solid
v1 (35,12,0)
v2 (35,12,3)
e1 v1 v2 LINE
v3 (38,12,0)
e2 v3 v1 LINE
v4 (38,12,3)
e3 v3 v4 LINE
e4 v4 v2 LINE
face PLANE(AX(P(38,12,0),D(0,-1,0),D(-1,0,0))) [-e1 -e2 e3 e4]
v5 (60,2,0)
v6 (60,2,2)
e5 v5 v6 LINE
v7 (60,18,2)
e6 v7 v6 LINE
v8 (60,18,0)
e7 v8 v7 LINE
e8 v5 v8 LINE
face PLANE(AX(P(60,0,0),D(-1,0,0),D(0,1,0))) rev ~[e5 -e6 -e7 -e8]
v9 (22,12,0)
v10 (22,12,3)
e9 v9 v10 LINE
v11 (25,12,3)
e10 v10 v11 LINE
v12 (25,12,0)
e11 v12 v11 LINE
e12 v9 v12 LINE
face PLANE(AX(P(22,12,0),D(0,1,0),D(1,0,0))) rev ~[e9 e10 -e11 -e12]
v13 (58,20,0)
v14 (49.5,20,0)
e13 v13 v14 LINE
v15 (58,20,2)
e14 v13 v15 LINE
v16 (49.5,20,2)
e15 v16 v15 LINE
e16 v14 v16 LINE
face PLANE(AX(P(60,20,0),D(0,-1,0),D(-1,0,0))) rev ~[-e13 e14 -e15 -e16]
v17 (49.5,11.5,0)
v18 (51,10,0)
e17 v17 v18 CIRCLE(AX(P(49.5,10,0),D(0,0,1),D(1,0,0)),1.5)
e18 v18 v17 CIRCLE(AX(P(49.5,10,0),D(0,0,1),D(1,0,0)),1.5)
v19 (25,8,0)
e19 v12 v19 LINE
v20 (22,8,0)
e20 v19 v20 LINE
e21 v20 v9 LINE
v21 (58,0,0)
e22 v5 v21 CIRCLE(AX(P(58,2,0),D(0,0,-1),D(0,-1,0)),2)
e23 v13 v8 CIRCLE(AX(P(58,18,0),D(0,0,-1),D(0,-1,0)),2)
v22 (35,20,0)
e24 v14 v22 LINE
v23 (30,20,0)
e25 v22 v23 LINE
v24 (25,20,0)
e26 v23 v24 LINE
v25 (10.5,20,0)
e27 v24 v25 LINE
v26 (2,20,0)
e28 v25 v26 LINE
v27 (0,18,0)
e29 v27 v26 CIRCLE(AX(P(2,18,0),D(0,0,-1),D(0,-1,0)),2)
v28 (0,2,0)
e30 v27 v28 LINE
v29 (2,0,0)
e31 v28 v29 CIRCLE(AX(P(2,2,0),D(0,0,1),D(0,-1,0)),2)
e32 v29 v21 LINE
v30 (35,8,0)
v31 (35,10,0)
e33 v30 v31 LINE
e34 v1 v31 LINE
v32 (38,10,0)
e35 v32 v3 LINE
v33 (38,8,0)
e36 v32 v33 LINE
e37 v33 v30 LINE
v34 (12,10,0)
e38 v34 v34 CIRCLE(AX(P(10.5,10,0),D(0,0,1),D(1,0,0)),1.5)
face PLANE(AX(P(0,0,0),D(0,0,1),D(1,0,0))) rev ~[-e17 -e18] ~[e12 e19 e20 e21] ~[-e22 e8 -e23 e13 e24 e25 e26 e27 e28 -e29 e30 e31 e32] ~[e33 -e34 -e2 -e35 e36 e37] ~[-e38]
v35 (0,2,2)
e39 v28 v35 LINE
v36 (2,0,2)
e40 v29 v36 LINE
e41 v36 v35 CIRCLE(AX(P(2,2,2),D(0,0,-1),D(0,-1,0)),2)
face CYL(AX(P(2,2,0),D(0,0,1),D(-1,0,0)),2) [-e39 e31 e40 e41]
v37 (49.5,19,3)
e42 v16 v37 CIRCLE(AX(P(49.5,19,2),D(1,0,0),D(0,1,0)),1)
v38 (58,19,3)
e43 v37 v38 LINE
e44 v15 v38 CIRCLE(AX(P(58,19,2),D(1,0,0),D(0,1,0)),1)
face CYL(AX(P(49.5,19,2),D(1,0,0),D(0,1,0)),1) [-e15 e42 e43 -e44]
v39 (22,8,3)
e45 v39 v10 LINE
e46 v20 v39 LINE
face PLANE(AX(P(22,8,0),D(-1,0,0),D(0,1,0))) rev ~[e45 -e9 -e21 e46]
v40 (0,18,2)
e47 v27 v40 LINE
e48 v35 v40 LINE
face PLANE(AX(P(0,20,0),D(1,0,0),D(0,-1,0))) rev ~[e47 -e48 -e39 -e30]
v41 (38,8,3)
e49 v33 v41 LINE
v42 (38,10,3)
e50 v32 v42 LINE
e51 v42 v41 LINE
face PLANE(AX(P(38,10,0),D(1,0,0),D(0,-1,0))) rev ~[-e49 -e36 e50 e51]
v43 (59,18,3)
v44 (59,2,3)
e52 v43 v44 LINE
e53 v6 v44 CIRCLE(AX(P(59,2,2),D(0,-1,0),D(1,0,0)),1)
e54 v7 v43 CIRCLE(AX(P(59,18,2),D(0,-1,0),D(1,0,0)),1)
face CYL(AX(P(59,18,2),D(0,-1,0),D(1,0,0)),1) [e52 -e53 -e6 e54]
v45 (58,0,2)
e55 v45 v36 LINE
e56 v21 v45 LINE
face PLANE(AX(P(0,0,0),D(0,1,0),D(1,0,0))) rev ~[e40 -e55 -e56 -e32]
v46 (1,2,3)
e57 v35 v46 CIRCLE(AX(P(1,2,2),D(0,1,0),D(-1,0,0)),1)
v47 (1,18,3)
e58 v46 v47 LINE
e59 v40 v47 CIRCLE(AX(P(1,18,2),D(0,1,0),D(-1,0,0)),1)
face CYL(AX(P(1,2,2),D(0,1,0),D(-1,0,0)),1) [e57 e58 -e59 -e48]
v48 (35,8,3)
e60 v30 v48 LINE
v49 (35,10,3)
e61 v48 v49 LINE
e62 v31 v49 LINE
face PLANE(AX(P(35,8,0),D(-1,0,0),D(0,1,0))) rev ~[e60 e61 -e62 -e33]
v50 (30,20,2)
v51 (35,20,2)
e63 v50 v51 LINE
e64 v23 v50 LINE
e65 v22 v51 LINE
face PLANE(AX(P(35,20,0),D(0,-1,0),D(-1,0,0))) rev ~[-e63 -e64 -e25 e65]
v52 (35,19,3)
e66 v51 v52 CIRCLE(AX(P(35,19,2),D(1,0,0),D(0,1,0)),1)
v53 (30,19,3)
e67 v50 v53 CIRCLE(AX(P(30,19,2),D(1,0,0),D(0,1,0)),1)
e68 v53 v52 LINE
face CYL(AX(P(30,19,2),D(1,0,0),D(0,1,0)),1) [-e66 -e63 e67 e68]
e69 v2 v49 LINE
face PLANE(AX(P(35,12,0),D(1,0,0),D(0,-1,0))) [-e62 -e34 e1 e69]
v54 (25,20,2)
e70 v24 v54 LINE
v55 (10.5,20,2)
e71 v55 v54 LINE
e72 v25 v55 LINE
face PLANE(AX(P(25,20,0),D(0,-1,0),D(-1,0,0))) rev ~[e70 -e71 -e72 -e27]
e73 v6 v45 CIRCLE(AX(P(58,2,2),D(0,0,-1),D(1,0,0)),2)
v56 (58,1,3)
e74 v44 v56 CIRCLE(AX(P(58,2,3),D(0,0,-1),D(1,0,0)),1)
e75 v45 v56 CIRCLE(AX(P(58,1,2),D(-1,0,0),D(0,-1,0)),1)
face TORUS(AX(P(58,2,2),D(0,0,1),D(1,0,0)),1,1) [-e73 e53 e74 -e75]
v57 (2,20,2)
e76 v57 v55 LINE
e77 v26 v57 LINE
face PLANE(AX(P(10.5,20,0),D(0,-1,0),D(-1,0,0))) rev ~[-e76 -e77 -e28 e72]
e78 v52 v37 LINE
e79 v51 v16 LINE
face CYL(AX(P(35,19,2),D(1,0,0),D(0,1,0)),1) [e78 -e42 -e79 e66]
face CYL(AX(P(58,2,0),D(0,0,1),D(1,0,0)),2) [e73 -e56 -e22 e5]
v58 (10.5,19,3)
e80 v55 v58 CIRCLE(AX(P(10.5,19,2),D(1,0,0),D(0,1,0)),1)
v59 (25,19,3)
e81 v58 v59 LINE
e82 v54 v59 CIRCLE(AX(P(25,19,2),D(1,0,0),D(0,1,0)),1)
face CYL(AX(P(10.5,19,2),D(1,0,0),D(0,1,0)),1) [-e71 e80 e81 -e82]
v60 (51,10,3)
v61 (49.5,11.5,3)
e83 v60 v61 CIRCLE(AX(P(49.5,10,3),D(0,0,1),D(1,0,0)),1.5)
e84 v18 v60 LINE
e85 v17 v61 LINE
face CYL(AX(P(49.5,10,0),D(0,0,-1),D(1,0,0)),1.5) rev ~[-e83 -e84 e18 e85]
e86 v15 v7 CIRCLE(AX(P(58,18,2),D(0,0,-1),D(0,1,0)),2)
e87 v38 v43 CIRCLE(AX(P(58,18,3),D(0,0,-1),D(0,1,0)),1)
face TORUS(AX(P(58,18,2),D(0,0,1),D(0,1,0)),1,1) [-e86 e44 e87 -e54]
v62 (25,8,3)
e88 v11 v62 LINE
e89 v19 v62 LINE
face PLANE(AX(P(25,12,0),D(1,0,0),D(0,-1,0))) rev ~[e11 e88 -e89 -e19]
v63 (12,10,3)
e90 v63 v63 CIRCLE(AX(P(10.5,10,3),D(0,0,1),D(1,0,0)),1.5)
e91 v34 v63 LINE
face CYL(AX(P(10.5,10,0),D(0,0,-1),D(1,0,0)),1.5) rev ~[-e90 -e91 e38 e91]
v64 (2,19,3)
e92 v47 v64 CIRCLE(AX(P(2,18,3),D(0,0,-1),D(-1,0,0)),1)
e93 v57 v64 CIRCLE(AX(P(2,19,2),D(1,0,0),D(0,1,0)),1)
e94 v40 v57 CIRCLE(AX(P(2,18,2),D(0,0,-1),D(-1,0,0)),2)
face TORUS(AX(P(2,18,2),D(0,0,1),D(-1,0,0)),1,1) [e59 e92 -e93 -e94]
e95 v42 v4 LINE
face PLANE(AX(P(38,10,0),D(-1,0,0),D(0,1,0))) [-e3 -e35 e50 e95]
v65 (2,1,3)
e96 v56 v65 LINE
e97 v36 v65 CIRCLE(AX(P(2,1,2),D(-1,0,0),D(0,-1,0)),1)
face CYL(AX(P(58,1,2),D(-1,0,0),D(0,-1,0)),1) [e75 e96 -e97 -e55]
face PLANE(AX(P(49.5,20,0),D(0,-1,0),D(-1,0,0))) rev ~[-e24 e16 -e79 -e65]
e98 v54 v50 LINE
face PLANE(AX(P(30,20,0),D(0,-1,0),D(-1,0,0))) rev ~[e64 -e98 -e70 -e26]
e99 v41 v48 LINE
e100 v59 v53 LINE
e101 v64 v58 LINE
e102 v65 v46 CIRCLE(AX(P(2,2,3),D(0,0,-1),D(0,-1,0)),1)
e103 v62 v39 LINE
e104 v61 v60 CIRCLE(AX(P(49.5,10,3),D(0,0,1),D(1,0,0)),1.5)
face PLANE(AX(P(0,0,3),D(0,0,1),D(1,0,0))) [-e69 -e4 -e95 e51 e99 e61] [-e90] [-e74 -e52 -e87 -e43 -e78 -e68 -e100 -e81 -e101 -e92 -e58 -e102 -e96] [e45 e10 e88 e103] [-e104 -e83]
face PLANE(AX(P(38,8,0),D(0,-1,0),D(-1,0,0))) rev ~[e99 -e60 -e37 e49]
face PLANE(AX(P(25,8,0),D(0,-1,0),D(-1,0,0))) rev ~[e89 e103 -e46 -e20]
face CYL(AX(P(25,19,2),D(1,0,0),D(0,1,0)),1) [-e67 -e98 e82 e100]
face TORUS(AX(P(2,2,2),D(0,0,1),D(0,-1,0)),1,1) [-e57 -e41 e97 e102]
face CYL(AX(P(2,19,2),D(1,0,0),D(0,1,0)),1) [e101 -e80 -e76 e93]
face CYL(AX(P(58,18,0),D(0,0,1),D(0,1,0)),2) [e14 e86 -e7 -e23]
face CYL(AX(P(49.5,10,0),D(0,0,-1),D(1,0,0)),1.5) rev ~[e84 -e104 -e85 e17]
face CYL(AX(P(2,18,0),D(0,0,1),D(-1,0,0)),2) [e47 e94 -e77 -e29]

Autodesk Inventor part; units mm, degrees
ref_plane "YZ Plane" through (0, 0, 0) normal (1, 0, 0) x (0, 1, 0)
ref_plane "XZ Plane" through (0, 0, 0) normal (0, 1, 0) x (-1, 0, 0)
ref_plane "XY Plane" through (0, 0, 0) normal (0, 0, 1) x (1, 0, 0)
sketch "Boceto1" plane through (0, 0, 0) normal (0, 0, 1) x (1, 0, 0)
  line L0 (0, 0) -> (60, 0)
  line L1 (60, 0) -> (60, 20)
  line L2 (60, 20) -> (0, 20)
  line L3 (0, 20) -> (0, 0)
  line L4 (30, 20) -> (10.5, 20)
  line L5 (30, 20) -> (49.5, 20)
  line L6 (49.5, 20) -> (49.5, 10)
  circle A0 centre (10.5, 10) radius 1.5
  circle A1 centre (49.5, 10) radius 1.5
  line L7 (30, 20) -> (35, 20)
  line L8 (35, 20) -> (35, 10)
  line L9 (38, 10) -> (38, 12)
  line L10 (38, 10) -> (38, 8)
  line L11 (38, 8) -> (35, 8)
  line L12 (35, 8) -> (35, 10)
  line L13 (38, 12) -> (35, 12)
  line L14 (30, 20) -> (25, 20)
  line L15 (25, 20) -> (25, 12)
  line L16 (25, 12) -> (25, 8)
  line L17 (25, 8) -> (22, 8)
  line L18 (22, 8) -> (22, 12)
  line L19 (22, 12) -> (25, 12)
  dimension "d0" = 60
  dimension "d1" = 20
  dimension "d2" = 19.5
  dimension "d3" = 19.5
  dimension "d4" = 10
  dimension "d5" = 3
  dimension "d6" = 3
  dimension "d7" = 5
  dimension "d8" = 3
  dimension "d9" = 2
  dimension "d10" = 2
  dimension "d11" = 5
  dimension "d12" = 3
extrude "Extrusión1" add sketch "Boceto1" along normal blind 3
fillet "Empalme1" radius 2 4 edges at (60, 20, 1.5) (60, 0, 1.5) (0, 20, 1.5) (0, 0, 1.5)
fillet "Empalme2" radius 1 8 edges at (0.5858, 19.4142, 3) (0, 10, 3) (0.5858, 0.5858, 3) (30, 0, 3) (59.4142, 0.5858, 3) (60, 10, 3) (59.4142, 19.4142, 3) (42.25, 20, 3)
properties part number "tapa_soporte_bateria"
